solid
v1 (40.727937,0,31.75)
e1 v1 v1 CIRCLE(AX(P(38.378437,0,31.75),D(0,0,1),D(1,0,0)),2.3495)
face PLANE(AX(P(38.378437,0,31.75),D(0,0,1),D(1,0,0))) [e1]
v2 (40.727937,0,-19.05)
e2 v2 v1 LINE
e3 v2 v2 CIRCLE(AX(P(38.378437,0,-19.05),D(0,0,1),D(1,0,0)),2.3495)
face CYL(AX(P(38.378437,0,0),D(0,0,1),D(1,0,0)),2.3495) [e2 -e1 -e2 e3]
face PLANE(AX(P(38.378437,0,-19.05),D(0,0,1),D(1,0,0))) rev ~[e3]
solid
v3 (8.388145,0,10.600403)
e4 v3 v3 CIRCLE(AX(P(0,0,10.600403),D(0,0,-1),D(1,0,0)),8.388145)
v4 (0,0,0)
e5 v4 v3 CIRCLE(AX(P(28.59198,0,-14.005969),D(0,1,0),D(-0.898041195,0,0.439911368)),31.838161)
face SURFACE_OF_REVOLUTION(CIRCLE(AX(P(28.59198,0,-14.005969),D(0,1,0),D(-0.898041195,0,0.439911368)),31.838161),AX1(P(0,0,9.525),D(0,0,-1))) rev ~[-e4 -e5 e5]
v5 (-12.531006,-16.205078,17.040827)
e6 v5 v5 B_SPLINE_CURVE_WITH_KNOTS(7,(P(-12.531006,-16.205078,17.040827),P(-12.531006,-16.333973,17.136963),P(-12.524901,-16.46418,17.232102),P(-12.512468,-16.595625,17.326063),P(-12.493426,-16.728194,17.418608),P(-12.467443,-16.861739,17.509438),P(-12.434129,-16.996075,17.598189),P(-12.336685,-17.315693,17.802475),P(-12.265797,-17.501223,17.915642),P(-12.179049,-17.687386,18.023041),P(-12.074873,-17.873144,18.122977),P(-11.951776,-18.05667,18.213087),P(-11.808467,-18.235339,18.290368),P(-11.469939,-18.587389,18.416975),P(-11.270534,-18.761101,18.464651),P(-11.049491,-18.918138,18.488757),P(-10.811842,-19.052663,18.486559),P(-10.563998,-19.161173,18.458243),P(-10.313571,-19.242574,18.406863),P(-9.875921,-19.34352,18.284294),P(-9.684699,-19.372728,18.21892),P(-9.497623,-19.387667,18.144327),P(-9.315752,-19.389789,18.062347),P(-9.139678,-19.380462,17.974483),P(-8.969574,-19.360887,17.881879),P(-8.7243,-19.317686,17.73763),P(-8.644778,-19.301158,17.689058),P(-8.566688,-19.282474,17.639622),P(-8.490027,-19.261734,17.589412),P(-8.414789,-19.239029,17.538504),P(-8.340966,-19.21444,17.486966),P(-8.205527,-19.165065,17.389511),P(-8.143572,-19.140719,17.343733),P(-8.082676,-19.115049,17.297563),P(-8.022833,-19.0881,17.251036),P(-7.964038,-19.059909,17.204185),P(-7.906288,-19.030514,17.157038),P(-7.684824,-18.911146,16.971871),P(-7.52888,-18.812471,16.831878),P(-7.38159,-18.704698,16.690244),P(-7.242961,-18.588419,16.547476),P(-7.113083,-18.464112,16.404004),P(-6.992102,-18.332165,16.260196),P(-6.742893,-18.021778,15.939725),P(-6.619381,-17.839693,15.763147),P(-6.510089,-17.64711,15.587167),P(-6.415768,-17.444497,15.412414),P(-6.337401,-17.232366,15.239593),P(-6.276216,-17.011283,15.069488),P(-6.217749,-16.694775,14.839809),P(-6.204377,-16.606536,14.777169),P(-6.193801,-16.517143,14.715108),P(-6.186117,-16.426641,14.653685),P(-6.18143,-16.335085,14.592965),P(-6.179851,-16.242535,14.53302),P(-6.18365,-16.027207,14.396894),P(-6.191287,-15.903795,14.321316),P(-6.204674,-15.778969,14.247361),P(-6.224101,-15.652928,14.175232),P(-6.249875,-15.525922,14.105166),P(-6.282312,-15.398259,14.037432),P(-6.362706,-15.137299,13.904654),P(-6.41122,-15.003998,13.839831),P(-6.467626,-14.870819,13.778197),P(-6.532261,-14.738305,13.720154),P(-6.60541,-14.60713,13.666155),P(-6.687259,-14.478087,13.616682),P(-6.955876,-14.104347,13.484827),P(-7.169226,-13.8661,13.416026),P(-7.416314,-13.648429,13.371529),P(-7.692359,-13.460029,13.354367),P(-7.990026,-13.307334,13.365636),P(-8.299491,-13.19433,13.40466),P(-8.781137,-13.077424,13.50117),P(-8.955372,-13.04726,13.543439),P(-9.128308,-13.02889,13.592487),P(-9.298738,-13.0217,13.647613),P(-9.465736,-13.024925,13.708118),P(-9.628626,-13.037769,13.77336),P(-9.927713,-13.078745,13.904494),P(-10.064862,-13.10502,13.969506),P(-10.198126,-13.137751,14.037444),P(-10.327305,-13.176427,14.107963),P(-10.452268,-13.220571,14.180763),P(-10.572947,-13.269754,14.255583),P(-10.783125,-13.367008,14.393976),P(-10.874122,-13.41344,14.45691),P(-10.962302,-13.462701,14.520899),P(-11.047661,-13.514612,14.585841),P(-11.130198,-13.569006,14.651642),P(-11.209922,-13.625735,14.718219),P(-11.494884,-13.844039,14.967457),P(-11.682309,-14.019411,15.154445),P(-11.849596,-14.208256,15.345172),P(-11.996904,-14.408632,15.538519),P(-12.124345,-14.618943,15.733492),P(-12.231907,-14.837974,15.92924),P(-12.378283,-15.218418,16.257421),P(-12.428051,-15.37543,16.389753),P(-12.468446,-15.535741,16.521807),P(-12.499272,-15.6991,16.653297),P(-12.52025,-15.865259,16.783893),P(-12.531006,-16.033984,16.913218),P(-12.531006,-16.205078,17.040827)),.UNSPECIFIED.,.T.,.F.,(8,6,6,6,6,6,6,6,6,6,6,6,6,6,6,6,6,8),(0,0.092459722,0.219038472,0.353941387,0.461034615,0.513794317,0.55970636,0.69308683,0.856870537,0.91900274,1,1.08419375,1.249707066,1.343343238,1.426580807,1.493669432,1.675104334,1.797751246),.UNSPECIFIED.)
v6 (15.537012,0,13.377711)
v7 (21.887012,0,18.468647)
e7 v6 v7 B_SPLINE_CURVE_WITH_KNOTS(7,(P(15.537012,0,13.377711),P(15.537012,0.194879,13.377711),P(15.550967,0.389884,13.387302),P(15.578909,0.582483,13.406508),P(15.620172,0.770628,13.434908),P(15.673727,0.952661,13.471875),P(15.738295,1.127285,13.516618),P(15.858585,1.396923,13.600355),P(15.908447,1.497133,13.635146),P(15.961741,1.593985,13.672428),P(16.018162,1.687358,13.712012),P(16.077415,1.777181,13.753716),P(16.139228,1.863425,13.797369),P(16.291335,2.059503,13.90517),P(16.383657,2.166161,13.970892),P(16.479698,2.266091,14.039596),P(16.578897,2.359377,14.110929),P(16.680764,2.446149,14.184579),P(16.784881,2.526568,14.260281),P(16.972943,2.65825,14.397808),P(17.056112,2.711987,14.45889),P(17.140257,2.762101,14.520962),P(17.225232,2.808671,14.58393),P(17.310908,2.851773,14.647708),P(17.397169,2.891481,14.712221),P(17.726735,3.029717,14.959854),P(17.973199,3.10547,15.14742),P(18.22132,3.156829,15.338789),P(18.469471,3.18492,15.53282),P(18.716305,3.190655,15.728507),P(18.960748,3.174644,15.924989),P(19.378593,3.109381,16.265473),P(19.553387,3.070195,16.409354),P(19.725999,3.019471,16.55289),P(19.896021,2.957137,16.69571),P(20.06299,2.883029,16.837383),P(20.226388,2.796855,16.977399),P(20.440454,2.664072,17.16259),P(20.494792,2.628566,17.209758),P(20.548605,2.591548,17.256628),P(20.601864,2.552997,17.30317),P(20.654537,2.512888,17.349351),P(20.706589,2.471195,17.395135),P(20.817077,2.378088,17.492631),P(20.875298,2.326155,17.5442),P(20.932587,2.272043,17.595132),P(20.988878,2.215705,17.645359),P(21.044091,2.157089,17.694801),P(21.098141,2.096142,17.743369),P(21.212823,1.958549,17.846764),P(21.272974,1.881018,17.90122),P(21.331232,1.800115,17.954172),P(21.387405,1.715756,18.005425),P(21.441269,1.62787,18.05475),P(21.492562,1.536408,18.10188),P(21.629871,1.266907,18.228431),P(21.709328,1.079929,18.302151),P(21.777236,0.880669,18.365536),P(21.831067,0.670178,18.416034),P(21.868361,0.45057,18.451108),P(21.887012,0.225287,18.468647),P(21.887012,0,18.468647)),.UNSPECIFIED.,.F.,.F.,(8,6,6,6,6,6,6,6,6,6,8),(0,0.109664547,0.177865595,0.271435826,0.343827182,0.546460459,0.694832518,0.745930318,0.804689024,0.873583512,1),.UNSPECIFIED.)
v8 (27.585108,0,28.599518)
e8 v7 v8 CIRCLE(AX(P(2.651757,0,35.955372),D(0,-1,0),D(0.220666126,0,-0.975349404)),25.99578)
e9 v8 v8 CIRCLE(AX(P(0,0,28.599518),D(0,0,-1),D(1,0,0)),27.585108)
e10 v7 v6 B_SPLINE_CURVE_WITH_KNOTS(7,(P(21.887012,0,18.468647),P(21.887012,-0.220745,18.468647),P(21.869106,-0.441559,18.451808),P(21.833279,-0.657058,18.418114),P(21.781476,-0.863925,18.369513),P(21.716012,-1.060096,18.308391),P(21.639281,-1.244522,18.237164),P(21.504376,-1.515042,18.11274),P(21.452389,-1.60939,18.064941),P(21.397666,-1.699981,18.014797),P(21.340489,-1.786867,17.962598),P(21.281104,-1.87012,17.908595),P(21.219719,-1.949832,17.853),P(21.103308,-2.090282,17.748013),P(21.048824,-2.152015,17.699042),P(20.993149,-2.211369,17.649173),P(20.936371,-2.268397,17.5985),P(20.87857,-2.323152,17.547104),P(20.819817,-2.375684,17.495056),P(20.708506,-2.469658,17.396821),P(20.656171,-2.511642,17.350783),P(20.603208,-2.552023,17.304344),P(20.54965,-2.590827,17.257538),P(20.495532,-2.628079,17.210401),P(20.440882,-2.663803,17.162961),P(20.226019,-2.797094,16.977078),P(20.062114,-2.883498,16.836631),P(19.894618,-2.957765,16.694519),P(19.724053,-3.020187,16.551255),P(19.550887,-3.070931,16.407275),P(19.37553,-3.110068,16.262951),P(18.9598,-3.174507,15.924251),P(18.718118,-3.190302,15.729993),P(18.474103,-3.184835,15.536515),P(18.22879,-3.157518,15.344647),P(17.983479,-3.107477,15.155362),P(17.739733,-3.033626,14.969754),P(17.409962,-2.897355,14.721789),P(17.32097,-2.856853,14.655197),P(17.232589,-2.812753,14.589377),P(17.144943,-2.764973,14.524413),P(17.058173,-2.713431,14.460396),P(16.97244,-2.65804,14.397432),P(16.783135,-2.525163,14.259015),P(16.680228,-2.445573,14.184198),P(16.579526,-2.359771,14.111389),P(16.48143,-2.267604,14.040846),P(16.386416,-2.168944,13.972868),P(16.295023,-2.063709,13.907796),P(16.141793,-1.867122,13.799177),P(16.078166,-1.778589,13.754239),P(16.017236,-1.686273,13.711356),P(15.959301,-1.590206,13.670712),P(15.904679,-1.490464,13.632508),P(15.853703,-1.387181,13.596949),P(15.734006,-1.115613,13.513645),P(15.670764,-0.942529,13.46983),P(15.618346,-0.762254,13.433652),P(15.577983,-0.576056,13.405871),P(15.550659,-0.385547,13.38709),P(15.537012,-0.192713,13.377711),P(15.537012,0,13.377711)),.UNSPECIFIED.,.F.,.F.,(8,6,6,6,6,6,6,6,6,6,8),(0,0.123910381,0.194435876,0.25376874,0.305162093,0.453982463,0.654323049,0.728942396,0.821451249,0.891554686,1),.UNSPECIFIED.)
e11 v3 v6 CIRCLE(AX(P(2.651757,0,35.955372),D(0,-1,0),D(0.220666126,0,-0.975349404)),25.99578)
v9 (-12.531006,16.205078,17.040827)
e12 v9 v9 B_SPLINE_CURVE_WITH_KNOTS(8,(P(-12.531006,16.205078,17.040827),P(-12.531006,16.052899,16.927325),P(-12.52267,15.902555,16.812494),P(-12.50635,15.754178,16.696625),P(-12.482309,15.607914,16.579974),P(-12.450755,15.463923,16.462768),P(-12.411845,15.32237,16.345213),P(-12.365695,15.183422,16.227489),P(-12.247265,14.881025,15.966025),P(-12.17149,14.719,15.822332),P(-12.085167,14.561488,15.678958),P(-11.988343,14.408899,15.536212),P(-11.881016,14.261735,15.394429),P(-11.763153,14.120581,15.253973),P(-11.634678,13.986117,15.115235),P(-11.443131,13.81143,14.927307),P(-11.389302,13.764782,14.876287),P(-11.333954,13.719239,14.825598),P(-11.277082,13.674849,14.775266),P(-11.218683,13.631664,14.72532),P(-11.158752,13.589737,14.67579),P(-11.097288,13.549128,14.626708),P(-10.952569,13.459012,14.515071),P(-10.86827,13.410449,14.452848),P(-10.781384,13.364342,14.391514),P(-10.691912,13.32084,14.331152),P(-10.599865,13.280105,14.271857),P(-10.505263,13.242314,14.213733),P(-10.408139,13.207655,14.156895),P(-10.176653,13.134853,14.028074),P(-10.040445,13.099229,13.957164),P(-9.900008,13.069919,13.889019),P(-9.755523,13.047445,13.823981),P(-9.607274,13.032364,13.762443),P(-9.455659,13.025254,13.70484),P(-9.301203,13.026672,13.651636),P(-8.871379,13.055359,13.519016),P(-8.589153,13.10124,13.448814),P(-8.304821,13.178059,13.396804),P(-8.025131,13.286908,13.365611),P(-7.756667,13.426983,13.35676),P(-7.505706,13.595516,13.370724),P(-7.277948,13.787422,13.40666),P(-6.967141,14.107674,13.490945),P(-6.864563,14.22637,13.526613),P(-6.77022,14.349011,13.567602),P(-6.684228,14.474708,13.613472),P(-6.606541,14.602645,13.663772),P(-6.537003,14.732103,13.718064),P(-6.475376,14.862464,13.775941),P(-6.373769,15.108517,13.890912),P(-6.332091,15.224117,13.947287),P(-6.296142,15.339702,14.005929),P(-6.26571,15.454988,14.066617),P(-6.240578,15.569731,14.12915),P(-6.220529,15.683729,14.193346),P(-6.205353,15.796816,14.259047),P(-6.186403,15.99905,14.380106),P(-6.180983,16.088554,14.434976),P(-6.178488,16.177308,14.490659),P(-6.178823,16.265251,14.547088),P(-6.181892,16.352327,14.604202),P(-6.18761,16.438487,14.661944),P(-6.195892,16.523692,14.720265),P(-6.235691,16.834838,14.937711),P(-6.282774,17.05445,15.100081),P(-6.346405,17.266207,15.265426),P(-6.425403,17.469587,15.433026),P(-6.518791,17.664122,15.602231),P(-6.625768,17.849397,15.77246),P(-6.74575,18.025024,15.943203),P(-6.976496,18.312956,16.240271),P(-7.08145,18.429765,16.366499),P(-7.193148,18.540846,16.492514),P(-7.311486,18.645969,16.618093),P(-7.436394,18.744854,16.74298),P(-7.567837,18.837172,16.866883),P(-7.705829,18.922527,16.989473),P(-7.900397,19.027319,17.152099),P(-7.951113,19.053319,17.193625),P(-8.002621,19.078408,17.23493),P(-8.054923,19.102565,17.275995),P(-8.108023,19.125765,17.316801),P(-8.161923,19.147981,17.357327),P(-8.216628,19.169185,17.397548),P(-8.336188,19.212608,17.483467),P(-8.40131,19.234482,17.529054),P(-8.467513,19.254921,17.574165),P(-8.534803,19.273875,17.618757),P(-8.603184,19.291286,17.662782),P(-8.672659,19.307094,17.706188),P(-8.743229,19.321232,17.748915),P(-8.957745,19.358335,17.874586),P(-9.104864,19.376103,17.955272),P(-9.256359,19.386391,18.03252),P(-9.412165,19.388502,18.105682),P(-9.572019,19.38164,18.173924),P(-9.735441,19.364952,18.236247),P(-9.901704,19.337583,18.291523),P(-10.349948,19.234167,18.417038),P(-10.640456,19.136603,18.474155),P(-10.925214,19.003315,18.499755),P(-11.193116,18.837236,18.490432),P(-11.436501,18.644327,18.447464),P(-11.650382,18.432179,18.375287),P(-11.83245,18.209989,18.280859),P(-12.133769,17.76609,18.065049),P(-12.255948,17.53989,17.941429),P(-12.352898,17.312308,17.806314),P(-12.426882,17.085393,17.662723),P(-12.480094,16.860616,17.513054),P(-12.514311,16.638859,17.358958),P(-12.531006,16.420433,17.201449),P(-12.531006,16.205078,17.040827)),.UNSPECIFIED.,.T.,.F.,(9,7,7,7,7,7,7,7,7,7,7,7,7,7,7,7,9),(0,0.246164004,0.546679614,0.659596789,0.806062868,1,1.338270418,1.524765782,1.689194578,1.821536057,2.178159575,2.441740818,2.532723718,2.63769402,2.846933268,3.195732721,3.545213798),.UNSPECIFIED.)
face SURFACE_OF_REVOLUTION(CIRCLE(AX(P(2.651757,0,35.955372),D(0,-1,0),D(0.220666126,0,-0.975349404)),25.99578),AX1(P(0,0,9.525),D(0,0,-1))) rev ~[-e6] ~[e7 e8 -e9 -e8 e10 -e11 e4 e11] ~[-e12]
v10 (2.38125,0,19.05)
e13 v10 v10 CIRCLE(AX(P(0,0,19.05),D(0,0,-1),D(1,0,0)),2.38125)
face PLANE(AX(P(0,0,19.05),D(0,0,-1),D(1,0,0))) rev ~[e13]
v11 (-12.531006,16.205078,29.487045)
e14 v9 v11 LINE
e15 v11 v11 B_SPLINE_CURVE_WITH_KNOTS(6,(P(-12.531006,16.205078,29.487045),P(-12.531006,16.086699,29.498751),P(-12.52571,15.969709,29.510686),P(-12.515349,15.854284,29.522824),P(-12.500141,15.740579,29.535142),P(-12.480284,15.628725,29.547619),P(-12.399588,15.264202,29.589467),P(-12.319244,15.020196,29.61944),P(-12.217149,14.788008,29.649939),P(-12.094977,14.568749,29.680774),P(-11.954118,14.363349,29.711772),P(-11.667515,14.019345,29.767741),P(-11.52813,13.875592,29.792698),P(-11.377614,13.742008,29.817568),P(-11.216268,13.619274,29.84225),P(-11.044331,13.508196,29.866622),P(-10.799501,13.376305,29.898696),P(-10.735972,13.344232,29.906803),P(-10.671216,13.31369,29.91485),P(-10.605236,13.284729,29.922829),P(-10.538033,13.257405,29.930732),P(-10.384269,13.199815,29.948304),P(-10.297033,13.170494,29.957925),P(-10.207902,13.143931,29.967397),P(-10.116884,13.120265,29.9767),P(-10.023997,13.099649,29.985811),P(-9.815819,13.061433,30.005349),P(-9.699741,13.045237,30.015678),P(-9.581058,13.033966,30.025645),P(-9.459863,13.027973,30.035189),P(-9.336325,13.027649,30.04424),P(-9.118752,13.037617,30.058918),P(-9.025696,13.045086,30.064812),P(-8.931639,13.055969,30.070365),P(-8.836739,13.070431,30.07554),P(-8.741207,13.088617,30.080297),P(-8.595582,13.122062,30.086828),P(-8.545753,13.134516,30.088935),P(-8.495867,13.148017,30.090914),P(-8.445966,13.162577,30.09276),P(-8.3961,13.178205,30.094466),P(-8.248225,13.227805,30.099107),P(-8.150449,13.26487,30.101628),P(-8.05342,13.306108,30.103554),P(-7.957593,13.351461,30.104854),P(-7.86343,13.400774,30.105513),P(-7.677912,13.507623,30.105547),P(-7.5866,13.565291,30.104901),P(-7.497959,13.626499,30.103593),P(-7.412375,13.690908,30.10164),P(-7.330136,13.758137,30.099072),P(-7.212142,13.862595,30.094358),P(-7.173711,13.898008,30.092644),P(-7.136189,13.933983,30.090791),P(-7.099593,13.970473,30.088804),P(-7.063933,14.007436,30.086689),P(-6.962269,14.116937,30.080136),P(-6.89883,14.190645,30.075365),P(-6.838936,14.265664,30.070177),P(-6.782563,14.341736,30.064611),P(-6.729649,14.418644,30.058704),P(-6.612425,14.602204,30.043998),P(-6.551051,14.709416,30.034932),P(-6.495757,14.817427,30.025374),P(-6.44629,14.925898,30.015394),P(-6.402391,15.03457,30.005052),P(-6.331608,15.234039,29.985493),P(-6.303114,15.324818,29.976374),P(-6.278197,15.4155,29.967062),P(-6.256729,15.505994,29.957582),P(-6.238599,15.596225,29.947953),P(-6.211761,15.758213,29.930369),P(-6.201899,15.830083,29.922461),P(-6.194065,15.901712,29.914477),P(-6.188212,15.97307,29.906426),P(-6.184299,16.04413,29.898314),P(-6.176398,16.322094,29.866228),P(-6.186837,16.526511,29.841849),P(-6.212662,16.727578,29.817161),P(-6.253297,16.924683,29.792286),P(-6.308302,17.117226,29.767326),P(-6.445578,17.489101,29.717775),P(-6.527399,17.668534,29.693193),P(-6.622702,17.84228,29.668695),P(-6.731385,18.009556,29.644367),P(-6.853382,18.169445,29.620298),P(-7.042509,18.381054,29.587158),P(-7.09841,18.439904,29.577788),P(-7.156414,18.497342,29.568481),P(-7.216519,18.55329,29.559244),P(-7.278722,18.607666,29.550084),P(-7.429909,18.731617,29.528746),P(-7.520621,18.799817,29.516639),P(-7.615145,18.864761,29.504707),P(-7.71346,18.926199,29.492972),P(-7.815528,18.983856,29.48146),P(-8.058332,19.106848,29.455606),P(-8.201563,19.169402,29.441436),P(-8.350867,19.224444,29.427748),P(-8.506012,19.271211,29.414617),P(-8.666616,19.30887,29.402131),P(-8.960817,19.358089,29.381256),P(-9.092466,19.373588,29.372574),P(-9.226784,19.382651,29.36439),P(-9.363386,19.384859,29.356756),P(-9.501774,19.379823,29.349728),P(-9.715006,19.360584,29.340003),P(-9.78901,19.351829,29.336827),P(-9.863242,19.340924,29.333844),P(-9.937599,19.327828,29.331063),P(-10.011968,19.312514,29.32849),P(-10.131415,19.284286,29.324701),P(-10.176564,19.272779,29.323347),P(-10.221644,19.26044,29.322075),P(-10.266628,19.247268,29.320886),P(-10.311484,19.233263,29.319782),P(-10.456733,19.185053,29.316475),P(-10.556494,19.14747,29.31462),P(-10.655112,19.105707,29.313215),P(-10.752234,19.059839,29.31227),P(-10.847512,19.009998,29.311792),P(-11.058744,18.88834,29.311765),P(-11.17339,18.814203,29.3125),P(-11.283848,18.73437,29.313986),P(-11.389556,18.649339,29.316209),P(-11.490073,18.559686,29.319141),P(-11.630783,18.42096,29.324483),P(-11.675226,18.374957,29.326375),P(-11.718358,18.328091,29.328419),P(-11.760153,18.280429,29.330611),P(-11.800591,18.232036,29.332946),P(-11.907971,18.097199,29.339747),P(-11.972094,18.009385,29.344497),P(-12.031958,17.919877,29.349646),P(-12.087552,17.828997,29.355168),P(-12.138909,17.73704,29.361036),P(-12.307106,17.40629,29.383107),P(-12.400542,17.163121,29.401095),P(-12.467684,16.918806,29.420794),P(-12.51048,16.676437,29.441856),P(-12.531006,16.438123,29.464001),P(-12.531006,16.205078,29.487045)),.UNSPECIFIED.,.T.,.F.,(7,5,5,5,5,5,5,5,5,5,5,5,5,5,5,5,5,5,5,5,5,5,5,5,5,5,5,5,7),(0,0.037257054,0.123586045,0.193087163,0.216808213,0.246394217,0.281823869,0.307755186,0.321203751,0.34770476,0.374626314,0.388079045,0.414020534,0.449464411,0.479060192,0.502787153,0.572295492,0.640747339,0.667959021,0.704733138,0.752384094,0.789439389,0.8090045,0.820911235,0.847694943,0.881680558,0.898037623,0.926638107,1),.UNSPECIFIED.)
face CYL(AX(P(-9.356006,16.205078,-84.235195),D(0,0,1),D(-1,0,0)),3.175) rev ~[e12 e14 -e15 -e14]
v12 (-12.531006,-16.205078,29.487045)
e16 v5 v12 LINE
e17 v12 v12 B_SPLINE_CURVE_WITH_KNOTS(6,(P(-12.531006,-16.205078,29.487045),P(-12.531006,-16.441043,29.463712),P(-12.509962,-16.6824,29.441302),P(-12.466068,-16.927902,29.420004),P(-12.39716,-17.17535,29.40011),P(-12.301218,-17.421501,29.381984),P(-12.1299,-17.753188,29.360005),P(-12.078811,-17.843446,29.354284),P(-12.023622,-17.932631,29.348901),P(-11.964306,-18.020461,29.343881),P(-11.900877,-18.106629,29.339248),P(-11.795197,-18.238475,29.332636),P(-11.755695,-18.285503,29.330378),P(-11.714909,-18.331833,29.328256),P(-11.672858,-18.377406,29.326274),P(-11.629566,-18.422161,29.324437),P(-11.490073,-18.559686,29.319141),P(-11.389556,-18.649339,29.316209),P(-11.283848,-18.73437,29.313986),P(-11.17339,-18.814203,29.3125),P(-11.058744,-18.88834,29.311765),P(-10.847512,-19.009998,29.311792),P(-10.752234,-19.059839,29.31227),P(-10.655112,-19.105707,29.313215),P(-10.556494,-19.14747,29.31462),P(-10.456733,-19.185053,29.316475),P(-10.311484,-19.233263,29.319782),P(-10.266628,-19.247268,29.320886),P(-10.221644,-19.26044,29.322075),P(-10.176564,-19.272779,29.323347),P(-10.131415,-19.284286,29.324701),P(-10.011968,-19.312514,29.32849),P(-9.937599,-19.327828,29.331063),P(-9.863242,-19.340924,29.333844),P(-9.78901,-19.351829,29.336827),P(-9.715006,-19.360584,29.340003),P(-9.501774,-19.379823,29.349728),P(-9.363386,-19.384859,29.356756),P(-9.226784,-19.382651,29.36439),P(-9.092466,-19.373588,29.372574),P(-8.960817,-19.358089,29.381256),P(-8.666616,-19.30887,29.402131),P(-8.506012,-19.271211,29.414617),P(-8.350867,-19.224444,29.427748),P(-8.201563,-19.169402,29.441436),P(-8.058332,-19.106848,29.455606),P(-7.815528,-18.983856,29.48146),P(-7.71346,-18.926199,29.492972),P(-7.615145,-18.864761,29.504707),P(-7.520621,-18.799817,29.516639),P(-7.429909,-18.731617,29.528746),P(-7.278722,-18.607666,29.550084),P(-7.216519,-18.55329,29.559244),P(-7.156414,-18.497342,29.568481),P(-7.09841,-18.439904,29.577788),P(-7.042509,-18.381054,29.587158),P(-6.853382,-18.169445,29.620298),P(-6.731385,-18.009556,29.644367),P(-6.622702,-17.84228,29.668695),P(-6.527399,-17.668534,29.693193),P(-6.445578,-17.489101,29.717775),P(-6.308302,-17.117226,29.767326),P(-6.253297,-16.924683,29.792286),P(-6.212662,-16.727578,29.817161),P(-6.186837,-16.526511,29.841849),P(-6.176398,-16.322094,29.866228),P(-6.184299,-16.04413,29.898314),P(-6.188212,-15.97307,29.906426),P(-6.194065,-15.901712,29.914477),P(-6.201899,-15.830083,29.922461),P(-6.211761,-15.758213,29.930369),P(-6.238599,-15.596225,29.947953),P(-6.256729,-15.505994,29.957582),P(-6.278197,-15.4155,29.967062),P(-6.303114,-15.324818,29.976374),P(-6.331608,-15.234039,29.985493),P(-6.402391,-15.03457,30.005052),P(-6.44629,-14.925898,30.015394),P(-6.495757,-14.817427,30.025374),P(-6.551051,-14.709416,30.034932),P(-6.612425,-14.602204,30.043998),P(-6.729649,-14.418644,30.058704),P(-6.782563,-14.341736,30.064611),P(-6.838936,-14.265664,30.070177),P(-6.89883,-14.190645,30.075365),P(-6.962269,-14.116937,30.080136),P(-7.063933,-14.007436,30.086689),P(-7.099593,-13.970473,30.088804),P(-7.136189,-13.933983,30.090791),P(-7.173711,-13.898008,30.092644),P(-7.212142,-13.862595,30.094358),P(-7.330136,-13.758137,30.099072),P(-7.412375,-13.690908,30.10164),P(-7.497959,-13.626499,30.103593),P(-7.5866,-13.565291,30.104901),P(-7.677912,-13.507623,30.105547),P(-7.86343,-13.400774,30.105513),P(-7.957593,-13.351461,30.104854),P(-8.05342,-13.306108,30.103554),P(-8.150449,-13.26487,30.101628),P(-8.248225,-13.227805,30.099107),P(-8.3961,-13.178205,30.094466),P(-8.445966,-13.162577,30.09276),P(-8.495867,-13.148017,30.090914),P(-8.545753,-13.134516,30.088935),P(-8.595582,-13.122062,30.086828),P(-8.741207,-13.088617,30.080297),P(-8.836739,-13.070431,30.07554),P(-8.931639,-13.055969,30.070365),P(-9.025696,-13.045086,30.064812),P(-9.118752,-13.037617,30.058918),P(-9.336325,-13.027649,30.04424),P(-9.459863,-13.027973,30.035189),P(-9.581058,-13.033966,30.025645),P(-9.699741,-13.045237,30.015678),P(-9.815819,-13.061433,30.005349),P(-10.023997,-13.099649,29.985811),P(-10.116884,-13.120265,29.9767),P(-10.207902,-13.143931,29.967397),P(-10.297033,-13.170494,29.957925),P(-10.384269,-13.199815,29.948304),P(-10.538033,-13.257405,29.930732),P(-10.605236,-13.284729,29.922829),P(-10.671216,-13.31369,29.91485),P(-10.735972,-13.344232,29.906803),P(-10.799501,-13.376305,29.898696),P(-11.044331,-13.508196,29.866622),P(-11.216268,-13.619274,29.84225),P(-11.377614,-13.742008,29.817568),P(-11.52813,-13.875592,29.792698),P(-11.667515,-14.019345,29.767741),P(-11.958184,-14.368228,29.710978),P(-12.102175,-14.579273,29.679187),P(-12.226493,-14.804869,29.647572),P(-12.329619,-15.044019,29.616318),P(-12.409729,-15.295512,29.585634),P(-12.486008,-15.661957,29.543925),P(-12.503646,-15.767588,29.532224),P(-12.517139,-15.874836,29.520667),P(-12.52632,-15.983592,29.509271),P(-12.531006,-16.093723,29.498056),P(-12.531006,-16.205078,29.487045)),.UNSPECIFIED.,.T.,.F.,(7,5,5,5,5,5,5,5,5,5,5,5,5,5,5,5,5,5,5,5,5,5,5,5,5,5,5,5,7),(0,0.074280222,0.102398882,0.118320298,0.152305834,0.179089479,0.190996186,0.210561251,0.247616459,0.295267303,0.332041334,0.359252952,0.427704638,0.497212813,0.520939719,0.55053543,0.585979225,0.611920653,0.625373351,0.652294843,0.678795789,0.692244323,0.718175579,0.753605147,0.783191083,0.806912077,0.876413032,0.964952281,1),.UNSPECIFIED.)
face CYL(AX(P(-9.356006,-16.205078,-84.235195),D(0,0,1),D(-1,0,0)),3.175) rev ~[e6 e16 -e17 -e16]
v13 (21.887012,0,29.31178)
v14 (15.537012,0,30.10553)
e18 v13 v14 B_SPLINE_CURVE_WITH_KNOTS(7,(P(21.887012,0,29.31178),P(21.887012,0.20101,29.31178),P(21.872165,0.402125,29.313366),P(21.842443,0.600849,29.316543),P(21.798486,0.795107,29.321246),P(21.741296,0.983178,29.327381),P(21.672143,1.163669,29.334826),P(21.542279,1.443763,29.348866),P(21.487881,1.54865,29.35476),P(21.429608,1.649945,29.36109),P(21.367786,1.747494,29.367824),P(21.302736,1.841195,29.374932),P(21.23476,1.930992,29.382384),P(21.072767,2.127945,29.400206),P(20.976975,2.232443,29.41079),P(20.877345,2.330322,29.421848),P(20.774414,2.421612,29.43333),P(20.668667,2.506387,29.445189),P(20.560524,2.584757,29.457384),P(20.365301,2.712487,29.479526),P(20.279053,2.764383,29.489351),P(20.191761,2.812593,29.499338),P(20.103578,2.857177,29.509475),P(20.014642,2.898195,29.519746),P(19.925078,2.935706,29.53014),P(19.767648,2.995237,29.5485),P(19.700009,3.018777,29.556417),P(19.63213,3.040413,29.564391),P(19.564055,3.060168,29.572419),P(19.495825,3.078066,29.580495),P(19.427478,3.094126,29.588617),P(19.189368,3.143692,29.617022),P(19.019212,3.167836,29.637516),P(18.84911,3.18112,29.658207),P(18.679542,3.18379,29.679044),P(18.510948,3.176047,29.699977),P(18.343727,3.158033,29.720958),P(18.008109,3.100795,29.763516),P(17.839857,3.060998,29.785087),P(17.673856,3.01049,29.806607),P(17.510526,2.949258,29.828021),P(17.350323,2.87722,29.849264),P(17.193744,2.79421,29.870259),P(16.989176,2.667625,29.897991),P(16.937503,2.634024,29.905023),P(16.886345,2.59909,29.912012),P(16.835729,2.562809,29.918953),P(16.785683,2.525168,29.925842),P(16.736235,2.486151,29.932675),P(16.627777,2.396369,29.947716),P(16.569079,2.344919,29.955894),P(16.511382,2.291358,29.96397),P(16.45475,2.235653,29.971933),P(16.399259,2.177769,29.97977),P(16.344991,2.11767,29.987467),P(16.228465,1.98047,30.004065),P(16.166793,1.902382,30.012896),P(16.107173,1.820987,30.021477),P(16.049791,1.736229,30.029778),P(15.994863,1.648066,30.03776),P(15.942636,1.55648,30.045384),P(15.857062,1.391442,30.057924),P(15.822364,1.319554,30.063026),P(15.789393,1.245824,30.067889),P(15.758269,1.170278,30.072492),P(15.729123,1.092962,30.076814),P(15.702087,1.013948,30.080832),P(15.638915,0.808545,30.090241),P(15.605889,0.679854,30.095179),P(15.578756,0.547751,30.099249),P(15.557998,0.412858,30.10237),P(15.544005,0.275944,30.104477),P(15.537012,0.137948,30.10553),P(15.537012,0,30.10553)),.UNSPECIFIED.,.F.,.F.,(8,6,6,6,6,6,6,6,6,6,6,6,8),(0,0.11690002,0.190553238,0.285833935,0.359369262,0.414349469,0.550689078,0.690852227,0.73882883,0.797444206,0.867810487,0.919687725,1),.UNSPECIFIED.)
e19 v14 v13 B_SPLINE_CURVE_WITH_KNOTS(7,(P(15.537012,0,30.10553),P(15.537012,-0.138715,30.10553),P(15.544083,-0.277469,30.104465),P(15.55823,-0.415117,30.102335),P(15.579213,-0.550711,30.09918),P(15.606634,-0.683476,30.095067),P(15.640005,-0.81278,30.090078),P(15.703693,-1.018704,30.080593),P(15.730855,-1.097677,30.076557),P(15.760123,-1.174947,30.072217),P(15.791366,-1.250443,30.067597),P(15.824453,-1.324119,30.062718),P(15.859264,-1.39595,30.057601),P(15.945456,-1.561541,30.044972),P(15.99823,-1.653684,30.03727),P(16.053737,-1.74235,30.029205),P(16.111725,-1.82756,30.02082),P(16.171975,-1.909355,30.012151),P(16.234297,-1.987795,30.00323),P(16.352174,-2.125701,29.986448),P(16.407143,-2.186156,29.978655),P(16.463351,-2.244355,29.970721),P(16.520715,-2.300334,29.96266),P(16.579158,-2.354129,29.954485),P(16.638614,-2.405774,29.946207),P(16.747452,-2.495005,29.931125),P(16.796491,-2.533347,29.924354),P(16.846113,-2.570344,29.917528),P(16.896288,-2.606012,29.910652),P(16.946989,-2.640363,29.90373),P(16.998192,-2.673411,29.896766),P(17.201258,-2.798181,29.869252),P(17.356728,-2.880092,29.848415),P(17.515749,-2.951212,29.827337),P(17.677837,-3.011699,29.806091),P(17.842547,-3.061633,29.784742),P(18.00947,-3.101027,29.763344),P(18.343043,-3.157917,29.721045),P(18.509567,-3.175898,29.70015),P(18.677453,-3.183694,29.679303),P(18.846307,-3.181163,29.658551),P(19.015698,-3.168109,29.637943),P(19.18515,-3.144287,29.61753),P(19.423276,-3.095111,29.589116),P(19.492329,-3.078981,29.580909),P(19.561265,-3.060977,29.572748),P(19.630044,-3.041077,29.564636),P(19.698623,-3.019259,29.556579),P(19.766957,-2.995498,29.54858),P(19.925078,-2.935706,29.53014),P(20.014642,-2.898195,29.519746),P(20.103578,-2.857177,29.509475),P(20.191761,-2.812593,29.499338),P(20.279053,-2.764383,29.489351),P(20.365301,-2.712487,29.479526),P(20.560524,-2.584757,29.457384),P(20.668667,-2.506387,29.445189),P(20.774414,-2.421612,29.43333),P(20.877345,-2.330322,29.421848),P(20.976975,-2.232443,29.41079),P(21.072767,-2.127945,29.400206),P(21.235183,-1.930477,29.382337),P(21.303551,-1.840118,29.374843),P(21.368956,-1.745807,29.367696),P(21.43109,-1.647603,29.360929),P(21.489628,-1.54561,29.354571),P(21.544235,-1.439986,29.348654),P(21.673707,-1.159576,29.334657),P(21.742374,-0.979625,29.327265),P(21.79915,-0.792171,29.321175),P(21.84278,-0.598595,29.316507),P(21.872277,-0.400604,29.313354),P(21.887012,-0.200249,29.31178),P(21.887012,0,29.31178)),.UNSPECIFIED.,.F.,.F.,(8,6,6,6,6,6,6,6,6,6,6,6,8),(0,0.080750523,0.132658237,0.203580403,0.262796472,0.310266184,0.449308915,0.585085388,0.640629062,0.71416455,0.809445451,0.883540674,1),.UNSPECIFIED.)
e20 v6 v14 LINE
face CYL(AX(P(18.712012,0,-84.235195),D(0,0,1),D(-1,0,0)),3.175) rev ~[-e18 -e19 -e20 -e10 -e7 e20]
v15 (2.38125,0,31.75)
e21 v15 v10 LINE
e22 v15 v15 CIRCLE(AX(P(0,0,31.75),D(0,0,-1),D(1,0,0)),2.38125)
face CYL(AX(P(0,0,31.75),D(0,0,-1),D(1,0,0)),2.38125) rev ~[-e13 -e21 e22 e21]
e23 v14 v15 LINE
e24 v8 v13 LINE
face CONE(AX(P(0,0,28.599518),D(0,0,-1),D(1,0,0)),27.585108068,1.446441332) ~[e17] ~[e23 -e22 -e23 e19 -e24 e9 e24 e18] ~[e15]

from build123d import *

# Parameters (mm, degrees)
F3_D          = 6.35
F4_R          = 2.3495
F5_DEPTH      = 31.75
F5_DEPTH_BACK = 19.05


# Not quite as in the source:
# - a feature names something its author has since deleted; it is built from what else it names


with BuildPart() as f1:
    # F0 (on Front) → F1 (revolve)
    with BuildSketch(Plane.XZ):
        with BuildLine():
            Line((0, 19.05), (0, 0))
            ThreePointArc((0, 0), (3.6250012472, 5.7505099882), (8.3881448954, 10.6004029512))
            ThreePointArc((8.3881448954, 10.6004029512), (20.4323715587, 16.9914499437), (27.5851080685, 28.5995177414))
            Line((27.5851080685, 28.5995177414), (2.38125, 31.75))
            Line((2.38125, 31.75), (2.38125, 19.05))
            Line((2.38125, 19.05), (0, 19.05))
        make_face()
    revolve(axis=Axis((0, 0, 9.525), (0, 0, -1)))

    # F3 (through all)
    with Locations(Plane(origin=(0, 0, 0), x_dir=(1, 0, 0), z_dir=(0, 0, -1))):
        with Locations((18.7120120972, 0), (-9.3560060486, -16.2050778321), (-9.3560060486, 16.2050778321)):
            Hole(F3_D / 2)


with BuildPart() as f5:
    # F4 (on Top) → F5 (new body, two sides)
    with BuildSketch(Plane.XY) as f5_sk:
        with Locations((38.3784368877, 0)):
            Circle(F4_R)
    extrude(amount=F5_DEPTH)
    extrude(f5_sk.sketch, amount=-F5_DEPTH_BACK)


solid = Compound([f1.part, f5.part])
